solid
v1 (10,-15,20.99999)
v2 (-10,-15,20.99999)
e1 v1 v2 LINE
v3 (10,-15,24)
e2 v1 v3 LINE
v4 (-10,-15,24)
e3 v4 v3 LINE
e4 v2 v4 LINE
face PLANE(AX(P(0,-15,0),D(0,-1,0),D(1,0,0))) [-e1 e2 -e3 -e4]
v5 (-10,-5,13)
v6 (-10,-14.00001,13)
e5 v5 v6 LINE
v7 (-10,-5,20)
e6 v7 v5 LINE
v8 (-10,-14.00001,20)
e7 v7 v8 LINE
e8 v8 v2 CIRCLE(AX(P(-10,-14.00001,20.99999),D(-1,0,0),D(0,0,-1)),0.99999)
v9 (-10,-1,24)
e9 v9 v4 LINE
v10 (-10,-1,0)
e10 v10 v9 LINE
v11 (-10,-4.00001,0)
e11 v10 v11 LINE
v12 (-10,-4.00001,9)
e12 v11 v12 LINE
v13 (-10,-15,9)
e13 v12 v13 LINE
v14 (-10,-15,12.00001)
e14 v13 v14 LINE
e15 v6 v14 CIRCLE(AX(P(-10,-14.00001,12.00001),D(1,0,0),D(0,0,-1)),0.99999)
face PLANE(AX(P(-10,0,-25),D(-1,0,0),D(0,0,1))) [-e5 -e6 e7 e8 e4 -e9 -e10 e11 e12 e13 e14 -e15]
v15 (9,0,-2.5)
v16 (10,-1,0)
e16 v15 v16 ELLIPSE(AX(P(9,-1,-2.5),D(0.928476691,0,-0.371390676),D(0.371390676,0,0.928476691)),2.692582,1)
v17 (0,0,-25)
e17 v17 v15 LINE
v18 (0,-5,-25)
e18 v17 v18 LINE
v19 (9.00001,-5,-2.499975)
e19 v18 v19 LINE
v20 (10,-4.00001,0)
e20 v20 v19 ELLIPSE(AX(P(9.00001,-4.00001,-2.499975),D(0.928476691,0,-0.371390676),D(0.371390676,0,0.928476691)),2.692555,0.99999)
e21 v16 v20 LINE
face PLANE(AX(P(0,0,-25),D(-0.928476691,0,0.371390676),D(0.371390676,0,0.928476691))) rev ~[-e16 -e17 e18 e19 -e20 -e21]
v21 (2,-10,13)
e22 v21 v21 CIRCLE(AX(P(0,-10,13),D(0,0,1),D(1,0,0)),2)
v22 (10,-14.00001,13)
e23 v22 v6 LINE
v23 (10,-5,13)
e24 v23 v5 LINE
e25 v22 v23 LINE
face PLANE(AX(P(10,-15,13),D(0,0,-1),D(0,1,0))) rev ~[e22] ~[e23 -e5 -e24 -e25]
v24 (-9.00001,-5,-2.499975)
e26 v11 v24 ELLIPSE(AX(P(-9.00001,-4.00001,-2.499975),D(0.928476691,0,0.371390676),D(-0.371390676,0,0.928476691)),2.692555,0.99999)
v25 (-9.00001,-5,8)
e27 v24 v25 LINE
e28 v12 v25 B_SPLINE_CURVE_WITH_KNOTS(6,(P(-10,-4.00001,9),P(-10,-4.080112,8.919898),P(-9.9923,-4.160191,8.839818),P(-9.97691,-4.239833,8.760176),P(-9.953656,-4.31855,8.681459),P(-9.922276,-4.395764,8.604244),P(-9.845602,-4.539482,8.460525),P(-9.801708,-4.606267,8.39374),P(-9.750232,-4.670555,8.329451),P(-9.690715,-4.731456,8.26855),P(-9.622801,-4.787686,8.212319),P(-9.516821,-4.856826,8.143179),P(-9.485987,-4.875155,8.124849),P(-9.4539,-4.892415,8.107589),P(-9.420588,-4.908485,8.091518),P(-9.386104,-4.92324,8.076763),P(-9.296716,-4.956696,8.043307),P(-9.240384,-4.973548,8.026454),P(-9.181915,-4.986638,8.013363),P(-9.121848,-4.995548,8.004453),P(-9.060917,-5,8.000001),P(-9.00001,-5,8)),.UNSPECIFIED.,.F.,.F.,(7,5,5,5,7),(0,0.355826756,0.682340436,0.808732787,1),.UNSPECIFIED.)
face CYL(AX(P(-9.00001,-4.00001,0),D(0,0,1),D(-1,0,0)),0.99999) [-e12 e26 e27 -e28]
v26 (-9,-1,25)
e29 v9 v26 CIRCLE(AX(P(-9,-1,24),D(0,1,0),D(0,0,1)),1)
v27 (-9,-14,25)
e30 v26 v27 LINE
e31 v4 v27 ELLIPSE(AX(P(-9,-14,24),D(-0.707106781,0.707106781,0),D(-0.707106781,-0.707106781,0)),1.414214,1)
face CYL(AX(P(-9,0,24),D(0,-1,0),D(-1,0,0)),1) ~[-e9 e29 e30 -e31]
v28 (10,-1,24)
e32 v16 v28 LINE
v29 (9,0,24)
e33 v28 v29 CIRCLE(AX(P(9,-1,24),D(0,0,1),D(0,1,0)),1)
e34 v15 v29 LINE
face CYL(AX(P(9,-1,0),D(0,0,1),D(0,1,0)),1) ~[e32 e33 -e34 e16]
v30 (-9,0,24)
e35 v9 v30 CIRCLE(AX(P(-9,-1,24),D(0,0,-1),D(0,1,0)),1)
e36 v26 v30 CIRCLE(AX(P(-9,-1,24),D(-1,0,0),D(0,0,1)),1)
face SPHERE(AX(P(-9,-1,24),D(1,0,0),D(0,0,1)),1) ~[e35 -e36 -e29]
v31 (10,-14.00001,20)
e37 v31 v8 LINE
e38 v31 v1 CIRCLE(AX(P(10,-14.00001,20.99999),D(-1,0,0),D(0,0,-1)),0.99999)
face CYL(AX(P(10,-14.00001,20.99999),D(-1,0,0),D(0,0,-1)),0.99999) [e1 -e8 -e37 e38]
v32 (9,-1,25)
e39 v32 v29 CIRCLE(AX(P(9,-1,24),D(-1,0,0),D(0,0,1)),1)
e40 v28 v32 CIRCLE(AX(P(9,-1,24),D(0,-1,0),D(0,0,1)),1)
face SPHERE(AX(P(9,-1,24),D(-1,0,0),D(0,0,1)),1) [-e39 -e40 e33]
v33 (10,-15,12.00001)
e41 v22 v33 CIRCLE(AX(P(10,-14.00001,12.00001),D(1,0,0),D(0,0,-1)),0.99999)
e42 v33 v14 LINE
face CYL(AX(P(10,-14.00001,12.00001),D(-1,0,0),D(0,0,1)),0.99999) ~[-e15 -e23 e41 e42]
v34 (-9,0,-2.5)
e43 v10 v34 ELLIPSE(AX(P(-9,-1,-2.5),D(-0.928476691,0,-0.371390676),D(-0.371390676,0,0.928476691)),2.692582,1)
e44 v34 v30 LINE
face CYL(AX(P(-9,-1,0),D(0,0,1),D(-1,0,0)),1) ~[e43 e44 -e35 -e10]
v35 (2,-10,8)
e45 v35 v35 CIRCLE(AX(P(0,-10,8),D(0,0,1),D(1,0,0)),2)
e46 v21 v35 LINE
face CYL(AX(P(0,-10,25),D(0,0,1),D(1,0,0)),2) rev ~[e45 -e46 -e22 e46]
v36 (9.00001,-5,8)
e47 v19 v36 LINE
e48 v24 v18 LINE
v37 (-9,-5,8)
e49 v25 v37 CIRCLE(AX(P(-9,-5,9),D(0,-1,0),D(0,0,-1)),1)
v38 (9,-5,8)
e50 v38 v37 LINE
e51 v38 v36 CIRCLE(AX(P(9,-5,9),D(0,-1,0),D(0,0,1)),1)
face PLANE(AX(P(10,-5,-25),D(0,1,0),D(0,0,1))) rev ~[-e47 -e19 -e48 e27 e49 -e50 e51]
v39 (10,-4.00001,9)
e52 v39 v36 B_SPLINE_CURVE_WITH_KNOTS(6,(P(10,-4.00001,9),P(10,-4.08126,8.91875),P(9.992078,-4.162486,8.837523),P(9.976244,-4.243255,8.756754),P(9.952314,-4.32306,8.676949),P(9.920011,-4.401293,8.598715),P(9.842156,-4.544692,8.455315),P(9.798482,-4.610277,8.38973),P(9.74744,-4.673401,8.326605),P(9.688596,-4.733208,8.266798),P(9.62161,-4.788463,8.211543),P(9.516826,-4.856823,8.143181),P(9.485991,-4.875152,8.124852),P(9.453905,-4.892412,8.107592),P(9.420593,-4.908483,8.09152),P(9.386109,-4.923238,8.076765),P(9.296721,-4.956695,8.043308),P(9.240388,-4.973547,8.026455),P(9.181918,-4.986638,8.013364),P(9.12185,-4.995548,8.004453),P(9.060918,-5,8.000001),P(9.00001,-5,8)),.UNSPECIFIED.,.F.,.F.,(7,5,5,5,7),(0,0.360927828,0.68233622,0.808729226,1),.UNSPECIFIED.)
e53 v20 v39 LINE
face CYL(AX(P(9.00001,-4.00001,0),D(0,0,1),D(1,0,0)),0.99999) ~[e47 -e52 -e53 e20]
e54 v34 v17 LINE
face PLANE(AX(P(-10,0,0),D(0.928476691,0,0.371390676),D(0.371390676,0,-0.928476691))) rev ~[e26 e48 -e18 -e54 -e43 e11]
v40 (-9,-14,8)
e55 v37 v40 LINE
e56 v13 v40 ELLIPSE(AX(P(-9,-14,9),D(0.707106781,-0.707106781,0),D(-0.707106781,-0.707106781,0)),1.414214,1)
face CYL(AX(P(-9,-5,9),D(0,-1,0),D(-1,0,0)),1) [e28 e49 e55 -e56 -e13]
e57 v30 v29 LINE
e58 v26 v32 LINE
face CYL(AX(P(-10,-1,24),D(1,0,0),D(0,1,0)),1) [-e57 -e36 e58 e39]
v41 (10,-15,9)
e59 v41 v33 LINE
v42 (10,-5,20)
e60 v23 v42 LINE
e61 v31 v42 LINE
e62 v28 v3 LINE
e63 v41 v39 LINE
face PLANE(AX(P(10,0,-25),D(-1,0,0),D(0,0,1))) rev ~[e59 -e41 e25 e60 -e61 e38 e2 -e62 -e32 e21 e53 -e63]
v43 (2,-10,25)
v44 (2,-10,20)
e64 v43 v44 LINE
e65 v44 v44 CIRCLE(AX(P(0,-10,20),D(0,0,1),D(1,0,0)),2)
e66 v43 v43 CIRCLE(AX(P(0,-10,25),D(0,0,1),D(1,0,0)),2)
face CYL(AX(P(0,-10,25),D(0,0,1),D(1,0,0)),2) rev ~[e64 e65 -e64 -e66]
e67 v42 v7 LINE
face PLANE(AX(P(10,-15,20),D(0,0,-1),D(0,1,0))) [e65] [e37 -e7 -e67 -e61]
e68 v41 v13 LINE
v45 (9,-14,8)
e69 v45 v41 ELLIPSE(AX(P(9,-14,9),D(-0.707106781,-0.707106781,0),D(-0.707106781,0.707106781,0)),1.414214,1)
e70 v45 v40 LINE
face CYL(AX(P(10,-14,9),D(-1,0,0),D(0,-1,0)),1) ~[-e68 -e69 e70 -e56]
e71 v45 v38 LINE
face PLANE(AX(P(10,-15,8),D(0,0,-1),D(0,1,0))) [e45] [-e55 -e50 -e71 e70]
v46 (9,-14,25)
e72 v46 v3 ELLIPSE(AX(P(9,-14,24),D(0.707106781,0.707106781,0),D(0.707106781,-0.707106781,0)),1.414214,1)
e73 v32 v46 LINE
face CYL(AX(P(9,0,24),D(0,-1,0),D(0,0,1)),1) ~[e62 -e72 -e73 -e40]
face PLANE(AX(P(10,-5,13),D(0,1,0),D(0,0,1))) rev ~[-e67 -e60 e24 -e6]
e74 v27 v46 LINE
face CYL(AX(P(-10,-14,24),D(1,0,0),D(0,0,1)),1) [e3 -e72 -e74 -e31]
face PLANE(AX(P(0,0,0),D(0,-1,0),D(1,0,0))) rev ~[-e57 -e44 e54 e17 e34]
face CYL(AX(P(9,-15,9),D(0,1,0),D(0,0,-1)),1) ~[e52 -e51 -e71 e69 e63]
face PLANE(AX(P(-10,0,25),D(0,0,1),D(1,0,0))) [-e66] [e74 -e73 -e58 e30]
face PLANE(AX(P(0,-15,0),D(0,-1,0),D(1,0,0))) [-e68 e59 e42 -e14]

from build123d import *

# Parameters (mm, degrees)
F0_W     = 20
F0_H     = 50
F1_DEPTH = 15
F2_W     = 10
F2_H     = 7
F2_H_2   = 33
F3_DEPTH = 20.001
F5_DEPTH = 15.001
F6_R     = 2
F7_DEPTH = 50.001
F8_R     = 1
F9_R     = 0.99999


# Not quite as in the source:
# - a fillet or chamfer is up to 0.001 mm smaller than in the source, because OpenCascade refuses the exact size


with BuildPart() as f1:
    # F0 (on Front) → F1 (new body)
    with BuildSketch(Plane.XZ):
        Rectangle(F0_W, F0_H)
    extrude(amount=F1_DEPTH)

    # F2 (on face) → F3 (cut, through all)
    with BuildSketch(Plane.YZ.offset(10)):
        with Locations((-10, 16.5)):
            Rectangle(F2_W, F2_H)
        with Locations((-10, -8.5)):
            Rectangle(F2_W, F2_H_2)
    extrude(amount=-F3_DEPTH, mode=Mode.SUBTRACT)

    # F4 (on face) → F5 (cut, through all)
    with BuildSketch(Plane(origin=(0, 0, 0), x_dir=(-1, 0, 0), z_dir=(0, 1, 0))):
        Polygon((0, -25), (-10, 0), (-10, -25), align=None)
        Polygon((10, 0), (0, -25), (10, -25), align=None)
    extrude(amount=-F5_DEPTH, mode=Mode.SUBTRACT)

    # F6 (on face) → F7 (cut, through all)
    with BuildSketch(Plane.XY.offset(25)):
        with Locations((0, -10)):
            Circle(F6_R)
    extrude(amount=-F7_DEPTH, mode=Mode.SUBTRACT)

    # F8
    f8_edges = [f1.edges().sort_by_distance(p)[0] for p in [
        (0, 0, 25),
        (10, -7.5, 25),
        (-10, -7.5, 25),
        (0, -15, 25),
        (10, 0, 12.5),
        (-10, 0, 12.5),
        (-10, -10, 8),
        (10, -10, 8),
        (0, -15, 8),
    ]]
    fillet(f8_edges, radius=F8_R)

    # F9 (radius 1 in the source; OpenCascade refuses exactly that, so slightly less here)
    f9_edges = [f1.edges().sort_by_distance(p)[0] for p in [
        (0, -15, 13),
        (0, -15, 20),
        (-10, -5, 4),
        (10, -5, 4),
    ]]
    fillet(f9_edges, radius=F9_R)


solid = f1.part
